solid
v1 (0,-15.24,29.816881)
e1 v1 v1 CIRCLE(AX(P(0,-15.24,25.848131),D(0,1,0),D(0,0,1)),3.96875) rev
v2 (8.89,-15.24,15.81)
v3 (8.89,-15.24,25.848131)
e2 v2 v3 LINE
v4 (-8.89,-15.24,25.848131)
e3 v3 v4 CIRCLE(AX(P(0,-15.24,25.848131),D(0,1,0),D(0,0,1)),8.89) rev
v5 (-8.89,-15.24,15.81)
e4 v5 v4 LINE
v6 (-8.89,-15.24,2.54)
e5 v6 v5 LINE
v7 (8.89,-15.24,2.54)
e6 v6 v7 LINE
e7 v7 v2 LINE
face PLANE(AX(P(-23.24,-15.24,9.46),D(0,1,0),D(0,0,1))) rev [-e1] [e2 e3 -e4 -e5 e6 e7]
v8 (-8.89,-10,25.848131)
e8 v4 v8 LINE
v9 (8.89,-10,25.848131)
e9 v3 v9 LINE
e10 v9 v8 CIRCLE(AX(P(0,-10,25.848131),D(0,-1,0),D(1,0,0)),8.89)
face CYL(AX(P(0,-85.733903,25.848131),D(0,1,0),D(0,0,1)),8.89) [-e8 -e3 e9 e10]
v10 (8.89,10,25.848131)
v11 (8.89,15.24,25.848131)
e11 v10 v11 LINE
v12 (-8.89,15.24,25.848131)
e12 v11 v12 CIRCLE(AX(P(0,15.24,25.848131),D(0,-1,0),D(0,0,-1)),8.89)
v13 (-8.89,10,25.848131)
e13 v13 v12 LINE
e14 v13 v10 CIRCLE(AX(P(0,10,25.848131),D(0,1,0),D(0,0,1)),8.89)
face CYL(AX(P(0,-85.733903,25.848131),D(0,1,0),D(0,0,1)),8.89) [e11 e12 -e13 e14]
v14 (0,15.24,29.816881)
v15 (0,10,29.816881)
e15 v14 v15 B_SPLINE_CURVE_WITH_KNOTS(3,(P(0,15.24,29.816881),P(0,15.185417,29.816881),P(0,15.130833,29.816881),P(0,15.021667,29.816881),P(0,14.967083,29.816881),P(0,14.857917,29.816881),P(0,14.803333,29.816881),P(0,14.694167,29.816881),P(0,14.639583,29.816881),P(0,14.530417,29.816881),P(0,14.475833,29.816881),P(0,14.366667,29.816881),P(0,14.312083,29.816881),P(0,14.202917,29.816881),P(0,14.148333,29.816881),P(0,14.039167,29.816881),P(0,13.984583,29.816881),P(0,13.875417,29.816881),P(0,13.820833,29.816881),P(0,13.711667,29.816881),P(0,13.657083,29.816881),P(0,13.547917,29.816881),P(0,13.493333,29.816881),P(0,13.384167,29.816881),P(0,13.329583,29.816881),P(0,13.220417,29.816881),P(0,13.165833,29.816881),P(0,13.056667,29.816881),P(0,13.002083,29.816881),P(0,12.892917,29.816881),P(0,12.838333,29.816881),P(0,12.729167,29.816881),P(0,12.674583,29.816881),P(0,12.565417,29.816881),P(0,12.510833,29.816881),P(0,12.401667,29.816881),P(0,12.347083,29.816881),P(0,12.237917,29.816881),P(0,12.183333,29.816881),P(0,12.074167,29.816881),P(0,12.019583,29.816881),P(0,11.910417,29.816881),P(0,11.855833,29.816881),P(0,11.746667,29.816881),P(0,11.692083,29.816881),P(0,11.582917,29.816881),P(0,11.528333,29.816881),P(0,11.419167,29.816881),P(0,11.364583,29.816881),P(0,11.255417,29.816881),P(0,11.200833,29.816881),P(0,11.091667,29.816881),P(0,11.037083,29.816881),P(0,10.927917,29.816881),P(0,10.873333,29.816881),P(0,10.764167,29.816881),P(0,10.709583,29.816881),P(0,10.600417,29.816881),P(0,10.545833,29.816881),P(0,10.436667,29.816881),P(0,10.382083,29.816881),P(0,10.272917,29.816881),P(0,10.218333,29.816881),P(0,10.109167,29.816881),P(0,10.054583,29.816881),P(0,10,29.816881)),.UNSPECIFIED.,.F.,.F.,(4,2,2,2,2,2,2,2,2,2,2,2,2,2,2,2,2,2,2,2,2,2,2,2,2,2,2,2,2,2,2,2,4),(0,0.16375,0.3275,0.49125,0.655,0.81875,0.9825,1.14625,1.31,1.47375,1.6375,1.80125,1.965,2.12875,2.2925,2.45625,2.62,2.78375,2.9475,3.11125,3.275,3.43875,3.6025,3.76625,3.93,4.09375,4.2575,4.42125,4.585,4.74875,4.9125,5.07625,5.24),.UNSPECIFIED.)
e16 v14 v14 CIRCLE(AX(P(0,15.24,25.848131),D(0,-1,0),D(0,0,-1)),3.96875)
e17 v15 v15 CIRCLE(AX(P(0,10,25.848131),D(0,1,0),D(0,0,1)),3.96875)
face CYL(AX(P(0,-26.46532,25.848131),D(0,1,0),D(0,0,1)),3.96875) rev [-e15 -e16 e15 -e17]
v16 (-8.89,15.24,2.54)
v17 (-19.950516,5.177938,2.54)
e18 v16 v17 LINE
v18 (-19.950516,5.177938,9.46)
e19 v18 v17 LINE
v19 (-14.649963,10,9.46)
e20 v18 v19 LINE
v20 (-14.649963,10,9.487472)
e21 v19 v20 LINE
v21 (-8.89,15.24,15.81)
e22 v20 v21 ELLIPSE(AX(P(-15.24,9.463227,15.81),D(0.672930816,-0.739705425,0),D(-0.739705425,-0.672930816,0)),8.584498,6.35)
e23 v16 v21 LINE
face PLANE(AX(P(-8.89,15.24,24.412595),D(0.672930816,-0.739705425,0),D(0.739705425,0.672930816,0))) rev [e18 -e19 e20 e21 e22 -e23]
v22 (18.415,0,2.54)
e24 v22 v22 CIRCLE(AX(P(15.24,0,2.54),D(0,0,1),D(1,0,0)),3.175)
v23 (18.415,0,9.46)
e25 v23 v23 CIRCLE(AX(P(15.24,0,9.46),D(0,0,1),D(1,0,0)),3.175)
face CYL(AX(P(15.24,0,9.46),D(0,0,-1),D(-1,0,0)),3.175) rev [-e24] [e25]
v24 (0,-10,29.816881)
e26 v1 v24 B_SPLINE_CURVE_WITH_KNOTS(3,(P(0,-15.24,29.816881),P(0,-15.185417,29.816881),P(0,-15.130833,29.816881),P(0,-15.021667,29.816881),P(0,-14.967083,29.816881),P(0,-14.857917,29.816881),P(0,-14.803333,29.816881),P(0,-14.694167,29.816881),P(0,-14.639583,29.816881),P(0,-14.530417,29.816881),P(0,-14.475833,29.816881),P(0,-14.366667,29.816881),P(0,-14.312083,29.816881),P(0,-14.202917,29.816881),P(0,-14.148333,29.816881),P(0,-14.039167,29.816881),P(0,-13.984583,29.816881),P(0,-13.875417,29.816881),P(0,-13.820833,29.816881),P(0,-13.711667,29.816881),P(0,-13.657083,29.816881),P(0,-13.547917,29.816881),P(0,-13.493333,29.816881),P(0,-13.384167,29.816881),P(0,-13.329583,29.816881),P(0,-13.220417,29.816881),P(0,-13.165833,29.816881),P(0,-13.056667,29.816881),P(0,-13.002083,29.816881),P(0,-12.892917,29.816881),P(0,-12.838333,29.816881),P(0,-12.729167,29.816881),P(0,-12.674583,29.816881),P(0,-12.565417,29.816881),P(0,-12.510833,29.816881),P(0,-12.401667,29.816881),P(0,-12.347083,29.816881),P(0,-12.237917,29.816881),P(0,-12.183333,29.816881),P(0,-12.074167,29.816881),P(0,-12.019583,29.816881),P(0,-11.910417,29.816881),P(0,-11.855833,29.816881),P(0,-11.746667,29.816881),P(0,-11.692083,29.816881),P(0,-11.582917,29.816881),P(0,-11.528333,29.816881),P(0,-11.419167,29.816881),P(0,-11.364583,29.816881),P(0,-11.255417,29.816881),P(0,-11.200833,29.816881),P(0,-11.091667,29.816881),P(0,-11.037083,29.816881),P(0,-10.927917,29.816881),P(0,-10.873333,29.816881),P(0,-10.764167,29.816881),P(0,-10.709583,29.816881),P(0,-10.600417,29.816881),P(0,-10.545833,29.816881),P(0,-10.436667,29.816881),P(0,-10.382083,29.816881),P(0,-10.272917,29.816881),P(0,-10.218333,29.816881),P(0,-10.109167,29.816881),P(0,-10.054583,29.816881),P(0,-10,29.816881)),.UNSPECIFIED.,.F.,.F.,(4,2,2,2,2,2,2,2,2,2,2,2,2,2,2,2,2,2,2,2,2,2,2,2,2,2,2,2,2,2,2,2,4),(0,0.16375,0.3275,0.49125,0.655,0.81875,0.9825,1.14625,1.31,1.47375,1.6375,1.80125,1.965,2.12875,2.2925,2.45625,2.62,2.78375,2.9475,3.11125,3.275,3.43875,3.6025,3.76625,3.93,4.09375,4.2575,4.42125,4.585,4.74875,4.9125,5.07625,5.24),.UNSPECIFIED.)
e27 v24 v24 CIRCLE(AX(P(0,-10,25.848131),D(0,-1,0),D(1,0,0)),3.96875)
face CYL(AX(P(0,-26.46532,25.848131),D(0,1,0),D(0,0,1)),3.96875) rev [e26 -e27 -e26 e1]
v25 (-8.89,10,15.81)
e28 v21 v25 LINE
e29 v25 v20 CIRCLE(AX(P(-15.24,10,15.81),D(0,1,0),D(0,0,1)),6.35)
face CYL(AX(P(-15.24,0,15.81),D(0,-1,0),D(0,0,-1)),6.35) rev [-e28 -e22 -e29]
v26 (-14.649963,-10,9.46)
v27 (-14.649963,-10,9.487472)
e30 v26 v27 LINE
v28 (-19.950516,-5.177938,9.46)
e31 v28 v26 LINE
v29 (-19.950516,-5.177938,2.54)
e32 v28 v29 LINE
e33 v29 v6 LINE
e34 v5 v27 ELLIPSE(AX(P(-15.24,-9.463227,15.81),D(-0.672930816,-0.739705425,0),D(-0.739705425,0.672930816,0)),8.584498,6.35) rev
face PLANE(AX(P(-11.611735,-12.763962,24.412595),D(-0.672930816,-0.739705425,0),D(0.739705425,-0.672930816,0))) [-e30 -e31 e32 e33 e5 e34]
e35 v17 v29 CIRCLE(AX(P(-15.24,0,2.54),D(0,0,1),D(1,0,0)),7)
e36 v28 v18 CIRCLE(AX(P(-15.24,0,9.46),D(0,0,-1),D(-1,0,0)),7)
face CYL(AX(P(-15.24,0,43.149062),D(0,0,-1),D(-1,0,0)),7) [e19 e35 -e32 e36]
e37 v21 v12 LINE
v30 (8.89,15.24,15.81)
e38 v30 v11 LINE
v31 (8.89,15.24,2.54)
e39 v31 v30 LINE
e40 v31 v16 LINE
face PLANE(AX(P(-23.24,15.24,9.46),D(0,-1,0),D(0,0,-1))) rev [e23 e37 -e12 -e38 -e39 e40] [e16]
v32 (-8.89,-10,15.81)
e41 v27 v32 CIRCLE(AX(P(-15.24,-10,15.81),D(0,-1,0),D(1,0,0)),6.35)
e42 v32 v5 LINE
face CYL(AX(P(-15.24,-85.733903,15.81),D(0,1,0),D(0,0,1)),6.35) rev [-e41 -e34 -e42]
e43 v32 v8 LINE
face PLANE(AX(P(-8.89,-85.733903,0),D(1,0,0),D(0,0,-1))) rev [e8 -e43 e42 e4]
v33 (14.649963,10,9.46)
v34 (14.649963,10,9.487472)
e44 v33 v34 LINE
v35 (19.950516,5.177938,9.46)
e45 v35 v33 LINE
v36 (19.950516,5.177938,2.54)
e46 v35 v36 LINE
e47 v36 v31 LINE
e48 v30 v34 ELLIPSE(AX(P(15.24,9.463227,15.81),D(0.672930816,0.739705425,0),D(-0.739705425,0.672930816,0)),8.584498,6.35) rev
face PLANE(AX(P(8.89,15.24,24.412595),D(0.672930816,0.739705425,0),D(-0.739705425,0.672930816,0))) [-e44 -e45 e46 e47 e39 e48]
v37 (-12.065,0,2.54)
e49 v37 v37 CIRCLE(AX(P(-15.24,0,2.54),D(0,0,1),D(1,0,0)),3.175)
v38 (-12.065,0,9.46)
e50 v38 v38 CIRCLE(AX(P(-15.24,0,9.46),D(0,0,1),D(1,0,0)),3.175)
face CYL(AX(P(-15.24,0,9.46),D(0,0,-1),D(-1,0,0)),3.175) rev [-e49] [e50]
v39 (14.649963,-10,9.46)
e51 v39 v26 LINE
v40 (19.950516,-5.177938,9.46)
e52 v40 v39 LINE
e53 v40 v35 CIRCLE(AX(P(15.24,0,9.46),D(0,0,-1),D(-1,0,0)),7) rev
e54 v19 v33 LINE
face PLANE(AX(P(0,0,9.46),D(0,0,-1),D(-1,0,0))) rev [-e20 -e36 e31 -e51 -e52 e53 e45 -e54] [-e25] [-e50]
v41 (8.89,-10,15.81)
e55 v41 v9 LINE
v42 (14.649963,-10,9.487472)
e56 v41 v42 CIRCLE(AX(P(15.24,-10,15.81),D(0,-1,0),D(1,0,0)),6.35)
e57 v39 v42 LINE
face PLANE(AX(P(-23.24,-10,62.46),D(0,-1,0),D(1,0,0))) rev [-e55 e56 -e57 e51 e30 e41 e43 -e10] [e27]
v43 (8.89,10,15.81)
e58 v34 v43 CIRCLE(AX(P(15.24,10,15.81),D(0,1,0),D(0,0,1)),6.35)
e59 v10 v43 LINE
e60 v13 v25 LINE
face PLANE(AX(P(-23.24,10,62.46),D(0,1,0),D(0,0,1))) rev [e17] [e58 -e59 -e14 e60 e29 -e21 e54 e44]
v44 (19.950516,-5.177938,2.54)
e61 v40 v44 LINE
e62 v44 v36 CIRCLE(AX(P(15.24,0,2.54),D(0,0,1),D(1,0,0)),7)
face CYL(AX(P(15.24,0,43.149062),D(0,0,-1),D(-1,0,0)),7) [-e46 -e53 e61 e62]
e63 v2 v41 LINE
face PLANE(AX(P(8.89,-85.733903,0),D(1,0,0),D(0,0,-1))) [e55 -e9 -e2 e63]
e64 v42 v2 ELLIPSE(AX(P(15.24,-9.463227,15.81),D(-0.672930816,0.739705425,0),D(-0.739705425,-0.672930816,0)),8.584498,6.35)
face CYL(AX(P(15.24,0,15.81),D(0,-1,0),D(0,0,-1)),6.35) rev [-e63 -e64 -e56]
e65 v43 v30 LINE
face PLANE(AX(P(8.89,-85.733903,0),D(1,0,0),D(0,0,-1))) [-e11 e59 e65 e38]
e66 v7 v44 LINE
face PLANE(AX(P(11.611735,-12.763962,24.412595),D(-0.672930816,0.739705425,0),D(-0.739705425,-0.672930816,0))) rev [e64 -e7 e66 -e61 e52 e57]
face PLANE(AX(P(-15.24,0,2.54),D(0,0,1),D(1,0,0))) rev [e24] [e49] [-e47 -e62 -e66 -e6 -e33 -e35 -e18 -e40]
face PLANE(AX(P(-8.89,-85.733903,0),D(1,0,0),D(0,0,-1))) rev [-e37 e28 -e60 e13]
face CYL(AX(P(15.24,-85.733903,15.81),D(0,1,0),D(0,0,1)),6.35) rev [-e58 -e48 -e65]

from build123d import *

# Parameters (mm, degrees)
SKETCH1_W                      = 46.48
SKETCH1_H                      = 30.48
SKETCH1_R                      = 3.175
BOSS_EXTRUDE1_DEPTH            = 9.46
SKETCH2_W                      = 46.48
SKETCH2_H                      = 5.24
BOSS_EXTRUDE2_DEPTH            = 53
CUT_EXTRUDE1_REACH             = 70.364
SKETCH4_R                      = 3.96875
CUT_EXTRUDE1_DIRECTION_2_REACH = 70.364
CUT_EXTRUDE3_REACH             = 70.364
CUT_EXTRUDE3_DIRECTION_2_REACH = 70.364
CUT_EXTRUDE4_DEPTH             = 9.46
BOSS_EXTRUDE3_DEPTH            = 9.46
FILLET3_R                      = 6.35
CUT_EXTRUDE5_DEPTH             = 2.54


with BuildPart() as part:
    # Sketch1 → Boss-Extrude1 (new body)
    with BuildSketch(Plane.XY):
        Rectangle(SKETCH1_W, SKETCH1_H)
        with Locations((15.24, 0)):
            Circle(SKETCH1_R, mode=Mode.SUBTRACT)
        with Locations((-15.24, 0)):
            Circle(SKETCH1_R, mode=Mode.SUBTRACT)
    extrude(amount=BOSS_EXTRUDE1_DEPTH)

    # Sketch2 → Boss-Extrude2 (add)
    with BuildSketch(Plane.XY.offset(9.46)):
        with Locations((0, 12.62)):
            Rectangle(SKETCH2_W, SKETCH2_H)
        with Locations((0, -12.62)):
            Rectangle(SKETCH2_W, SKETCH2_H)
    extrude(amount=BOSS_EXTRUDE2_DEPTH)

    # Cut-Extrude1: up to this face of the body (flat: up to its plane)
    cut_extrude1_end = Plane(part.part.faces().sort_by_distance((0, -15.24, 31.23))[0])
    # Sketch4 → Cut-Extrude1 (cut, up to the picked face)
    with BuildSketch(Plane(origin=(0, 0, 0), x_dir=(1, 0, 0), z_dir=(0, 1, 0)), mode=Mode.PRIVATE) as cut_extrude1_sk1:
        with Locations(Location((0, -25.8481308, 0), (0, 0, 270))):
            Circle(SKETCH4_R)
    cut_extrude1_tool1 = split(extrude(cut_extrude1_sk1.sketch, amount=-CUT_EXTRUDE1_REACH, mode=Mode.PRIVATE), bisect_by=cut_extrude1_end, keep=Keep.BOTH, mode=Mode.PRIVATE)
    add(cut_extrude1_tool1.solids().sort_by(Axis((0, 0, 25.848131), (0, -1, 0)))[0], mode=Mode.SUBTRACT)

    # Cut-Extrude1 direction 2: up to this face of the body (flat: up to its plane)
    cut_extrude1_direction_2_end = Plane(part.part.faces().sort_by_distance((0, 15.24, 31.23))[0])
    # Sketch4 → Cut-Extrude1 direction 2 (cut, up to the picked face)
    with BuildSketch(Plane(origin=(0, 0, 0), x_dir=(1, 0, 0), z_dir=(0, 1, 0)), mode=Mode.PRIVATE) as cut_extrude1_direction_2_sk1:
        with Locations(Location((0, -25.8481308, 0), (0, 0, 270))):
            Circle(SKETCH4_R)
    cut_extrude1_direction_2_tool1 = split(extrude(cut_extrude1_direction_2_sk1.sketch, amount=CUT_EXTRUDE1_DIRECTION_2_REACH, mode=Mode.PRIVATE), bisect_by=cut_extrude1_direction_2_end, keep=Keep.BOTH, mode=Mode.PRIVATE)
    add(cut_extrude1_direction_2_tool1.solids().sort_by(Axis((0, 0, 25.848131), (0, 1, 0)))[0], mode=Mode.SUBTRACT)

    # Cut-Extrude3: up to this face of the body (flat: up to its plane)
    cut_extrude3_end = Plane(part.part.faces().sort_by_distance((0, -15.24, 31.323322986))[0])
    # Sketch6 → Cut-Extrude3 (cut, up to the picked face)
    with BuildSketch(Plane(origin=(0, 0, 0), x_dir=(1, 0, 0), z_dir=(0, 1, 0)), mode=Mode.PRIVATE) as cut_extrude3_sk1:
        with BuildLine():
            Line((-8.89, -25.8481308), (-8.89, -17.46))
            Line((-8.89, -17.46), (-8.89, -9.46))
            Line((-8.89, -9.46), (-16.89, -9.46))
            Line((-16.89, -9.46), (-23.24, -9.46))
            Line((-23.24, -9.46), (-23.24, -62.46))
            Line((-23.24, -62.46), (23.24, -62.46))
            Line((23.24, -62.46), (23.24, -9.46))
            Line((23.24, -9.46), (16.89, -9.46))
            Line((16.89, -9.46), (8.89, -9.46))
            Line((8.89, -9.46), (8.89, -17.46))
            Line((8.89, -17.46), (8.89, -25.8481308))
            ThreePointArc((8.89, -25.8481308), (0, -34.7381308), (-8.89, -25.8481308))
        make_face()
    cut_extrude3_tool1 = split(extrude(cut_extrude3_sk1.sketch, amount=-CUT_EXTRUDE3_REACH, mode=Mode.PRIVATE), bisect_by=cut_extrude3_end, keep=Keep.BOTH, mode=Mode.PRIVATE)
    add(cut_extrude3_tool1.solids().sort_by(Axis((0, 0, 38.948856), (0, -1, 0)))[0], mode=Mode.SUBTRACT)

    # Cut-Extrude3 direction 2: up to this face of the body (flat: up to its plane)
    cut_extrude3_direction_2_end = Plane(part.part.faces().sort_by_distance((0, 15.24, 31.323322986))[0])
    # Sketch6 → Cut-Extrude3 direction 2 (cut, up to the picked face)
    with BuildSketch(Plane(origin=(0, 0, 0), x_dir=(1, 0, 0), z_dir=(0, 1, 0)), mode=Mode.PRIVATE) as cut_extrude3_direction_2_sk1:
        with BuildLine():
            Line((-8.89, -25.8481308), (-8.89, -17.46))
            Line((-8.89, -17.46), (-8.89, -9.46))
            Line((-8.89, -9.46), (-16.89, -9.46))
            Line((-16.89, -9.46), (-23.24, -9.46))
            Line((-23.24, -9.46), (-23.24, -62.46))
            Line((-23.24, -62.46), (23.24, -62.46))
            Line((23.24, -62.46), (23.24, -9.46))
            Line((23.24, -9.46), (16.89, -9.46))
            Line((16.89, -9.46), (8.89, -9.46))
            Line((8.89, -9.46), (8.89, -17.46))
            Line((8.89, -17.46), (8.89, -25.8481308))
            ThreePointArc((8.89, -25.8481308), (0, -34.7381308), (-8.89, -25.8481308))
        make_face()
    cut_extrude3_direction_2_tool1 = split(extrude(cut_extrude3_direction_2_sk1.sketch, amount=CUT_EXTRUDE3_DIRECTION_2_REACH, mode=Mode.PRIVATE), bisect_by=cut_extrude3_direction_2_end, keep=Keep.BOTH, mode=Mode.PRIVATE)
    add(cut_extrude3_direction_2_tool1.solids().sort_by(Axis((0, 0, 38.948856), (0, 1, 0)))[0], mode=Mode.SUBTRACT)

    # Sketch7 → Cut-Extrude4 (cut)
    with BuildSketch(Plane.XY):
        with BuildLine():
            ThreePointArc((-15.24, -7), (-22.24, 0), (-15.24, 7))
            Line((-15.24, 7), (-8.89, 7))
            Line((-8.89, 7), (-8.89, 15.24))
            Line((-8.89, 15.24), (-23.24, 15.24))
            Line((-23.24, 15.24), (-23.24, -15.24))
            Line((-23.24, -15.24), (-8.89, -15.24))
            Line((-8.89, -15.24), (-8.89, -7))
            Line((-8.89, -7), (-15.24, -7))
        make_face()
        with BuildLine():
            Line((8.89, 15.24), (8.89, 7))
            Line((8.89, 7), (15.24, 7))
            ThreePointArc((15.24, 7), (22.24, 0), (15.24, -7))
            Line((15.24, -7), (8.89, -7))
            Line((8.89, -7), (8.89, -15.24))
            Line((8.89, -15.24), (23.24, -15.24))
            Line((23.24, -15.24), (23.24, 15.24))
            Line((23.24, 15.24), (8.89, 15.24))
        make_face()
    extrude(amount=CUT_EXTRUDE4_DEPTH, mode=Mode.SUBTRACT)

    # Sketch8 → Boss-Extrude3 (add)
    with BuildSketch(Plane.XY):
        with BuildLine():
            Line((8.89, -15.24), (19.950515714, -5.177937978))
            ThreePointArc((19.950515714, -5.177937978), (17.765315243, -6.528612634), (15.24, -7))
            Line((15.24, -7), (8.89, -7))
            Line((8.89, -7), (8.89, -15.24))
        make_face()
        with BuildLine():
            ThreePointArc((-19.950515714, -5.177937978), (-17.765315243, -6.528612634), (-15.24, -7))
            Line((-15.24, -7), (-8.89, -7))
            Line((-8.89, -7), (-8.89, -15.24))
            Line((-8.89, -15.24), (-19.950515714, -5.177937978))
        make_face()
        with BuildLine():
            Line((8.89, 15.24), (19.950515714, 5.177937978))
            ThreePointArc((19.950515714, 5.177937978), (17.765315243, 6.528612634), (15.24, 7))
            Line((15.24, 7), (8.89, 7))
            Line((8.89, 7), (8.89, 15.24))
        make_face()
        with BuildLine():
            Line((-8.89, 15.24), (-19.950515714, 5.177937978))
            ThreePointArc((-19.950515714, 5.177937978), (-17.765315243, 6.528612634), (-15.24, 7))
            Line((-15.24, 7), (-8.89, 7))
            Line((-8.89, 7), (-8.89, 15.24))
        make_face()
    extrude(amount=BOSS_EXTRUDE3_DEPTH)

    # Fillet3
    # the kernel refuses this fillet: 6.35 mm, written as the material it adds along each edge
    with BuildSketch(Plane(origin=(8.89, -10, 9.46), x_dir=(0, 0, 1), z_dir=(0, -1, 0))) as fillet3_piece_1_section:
        with BuildLine():
            CenterArc((FILLET3_R, -FILLET3_R), FILLET3_R, 90, 90)
            Line((0, -FILLET3_R), (0, 0))
            Line((0, 0), (FILLET3_R, 0))
        make_face()
    fillet3_piece_1 = extrude(amount=5.24, mode=Mode.PRIVATE)
    fillet3_piece_1 = split(fillet3_piece_1, bisect_by=Plane(origin=(10.975439596, -13.342816984, 11.151175663), z_dir=(-0.6729308163346117, 0.7397054254412585, 0)), keep=Keep.TOP, mode=Mode.PRIVATE)
    add(fillet3_piece_1)
    with BuildSketch(Plane(origin=(-8.89, -10, 9.46), x_dir=(0, 0, 1), z_dir=(0, -1, 0))) as fillet3_piece_2_section:
        with BuildLine():
            CenterArc((FILLET3_R, FILLET3_R), FILLET3_R, 180, 90)
            Line((0, FILLET3_R), (0, 0))
            Line((0, 0), (FILLET3_R, 0))
        make_face()
    fillet3_piece_2 = extrude(amount=5.24, mode=Mode.PRIVATE)
    fillet3_piece_2 = split(fillet3_piece_2, bisect_by=Plane(origin=(-10.975439596, -13.342816984, 11.151175663), z_dir=(0.6729308163346114, 0.7397054254412588, 0)), keep=Keep.TOP, mode=Mode.PRIVATE)
    add(fillet3_piece_2)
    with BuildSketch(Plane(origin=(8.89, 10, 9.46), x_dir=(1, 0, 0), z_dir=(0, 1, 0))) as fillet3_piece_3_section:
        with BuildLine():
            CenterArc((FILLET3_R, -FILLET3_R), FILLET3_R, 90, 90)
            Line((0, -FILLET3_R), (0, 0))
            Line((0, 0), (FILLET3_R, 0))
        make_face()
    fillet3_piece_3 = extrude(amount=5.24, mode=Mode.PRIVATE)
    fillet3_piece_3 = split(fillet3_piece_3, bisect_by=Plane(origin=(10.975439596, 13.342816985, 11.151175663), z_dir=(-0.6729308163346115, -0.7397054254412587, 0)), keep=Keep.TOP, mode=Mode.PRIVATE)
    add(fillet3_piece_3)
    with BuildSketch(Plane(origin=(-8.89, 10, 9.46), x_dir=(-1, 0, 0), z_dir=(0, 1, 0))) as fillet3_piece_4_section:
        with BuildLine():
            CenterArc((FILLET3_R, FILLET3_R), FILLET3_R, 180, 90)
            Line((0, FILLET3_R), (0, 0))
            Line((0, 0), (FILLET3_R, 0))
        make_face()
    fillet3_piece_4 = extrude(amount=5.24, mode=Mode.PRIVATE)
    fillet3_piece_4 = split(fillet3_piece_4, bisect_by=Plane(origin=(-10.975439596, 13.342816985, 11.151175663), z_dir=(0.6729308163346117, -0.7397054254412585, 0)), keep=Keep.TOP, mode=Mode.PRIVATE)
    add(fillet3_piece_4)

    # Sketch10 → Cut-Extrude5 (cut)
    with BuildSketch(Plane.XY):
        with BuildLine():
            Line((-8.89, 15.24), (-19.950515714, 5.177937978))
            ThreePointArc((-19.950515714, 5.177937978), (-22.24, 0), (-19.950515714, -5.177937978))
            Line((-19.950515714, -5.177937978), (-8.89, -15.24))
            Line((-8.89, -15.24), (8.89, -15.24))
            Line((8.89, -15.24), (19.950515714, -5.177937978))
            ThreePointArc((19.950515714, -5.177937978), (22.24, 0), (19.950515714, 5.177937978))
            Line((19.950515714, 5.177937978), (8.89, 15.24))
            Line((8.89, 15.24), (-8.89, 15.24))
        make_face()
    extrude(amount=CUT_EXTRUDE5_DEPTH, mode=Mode.SUBTRACT)


solid = part.part
